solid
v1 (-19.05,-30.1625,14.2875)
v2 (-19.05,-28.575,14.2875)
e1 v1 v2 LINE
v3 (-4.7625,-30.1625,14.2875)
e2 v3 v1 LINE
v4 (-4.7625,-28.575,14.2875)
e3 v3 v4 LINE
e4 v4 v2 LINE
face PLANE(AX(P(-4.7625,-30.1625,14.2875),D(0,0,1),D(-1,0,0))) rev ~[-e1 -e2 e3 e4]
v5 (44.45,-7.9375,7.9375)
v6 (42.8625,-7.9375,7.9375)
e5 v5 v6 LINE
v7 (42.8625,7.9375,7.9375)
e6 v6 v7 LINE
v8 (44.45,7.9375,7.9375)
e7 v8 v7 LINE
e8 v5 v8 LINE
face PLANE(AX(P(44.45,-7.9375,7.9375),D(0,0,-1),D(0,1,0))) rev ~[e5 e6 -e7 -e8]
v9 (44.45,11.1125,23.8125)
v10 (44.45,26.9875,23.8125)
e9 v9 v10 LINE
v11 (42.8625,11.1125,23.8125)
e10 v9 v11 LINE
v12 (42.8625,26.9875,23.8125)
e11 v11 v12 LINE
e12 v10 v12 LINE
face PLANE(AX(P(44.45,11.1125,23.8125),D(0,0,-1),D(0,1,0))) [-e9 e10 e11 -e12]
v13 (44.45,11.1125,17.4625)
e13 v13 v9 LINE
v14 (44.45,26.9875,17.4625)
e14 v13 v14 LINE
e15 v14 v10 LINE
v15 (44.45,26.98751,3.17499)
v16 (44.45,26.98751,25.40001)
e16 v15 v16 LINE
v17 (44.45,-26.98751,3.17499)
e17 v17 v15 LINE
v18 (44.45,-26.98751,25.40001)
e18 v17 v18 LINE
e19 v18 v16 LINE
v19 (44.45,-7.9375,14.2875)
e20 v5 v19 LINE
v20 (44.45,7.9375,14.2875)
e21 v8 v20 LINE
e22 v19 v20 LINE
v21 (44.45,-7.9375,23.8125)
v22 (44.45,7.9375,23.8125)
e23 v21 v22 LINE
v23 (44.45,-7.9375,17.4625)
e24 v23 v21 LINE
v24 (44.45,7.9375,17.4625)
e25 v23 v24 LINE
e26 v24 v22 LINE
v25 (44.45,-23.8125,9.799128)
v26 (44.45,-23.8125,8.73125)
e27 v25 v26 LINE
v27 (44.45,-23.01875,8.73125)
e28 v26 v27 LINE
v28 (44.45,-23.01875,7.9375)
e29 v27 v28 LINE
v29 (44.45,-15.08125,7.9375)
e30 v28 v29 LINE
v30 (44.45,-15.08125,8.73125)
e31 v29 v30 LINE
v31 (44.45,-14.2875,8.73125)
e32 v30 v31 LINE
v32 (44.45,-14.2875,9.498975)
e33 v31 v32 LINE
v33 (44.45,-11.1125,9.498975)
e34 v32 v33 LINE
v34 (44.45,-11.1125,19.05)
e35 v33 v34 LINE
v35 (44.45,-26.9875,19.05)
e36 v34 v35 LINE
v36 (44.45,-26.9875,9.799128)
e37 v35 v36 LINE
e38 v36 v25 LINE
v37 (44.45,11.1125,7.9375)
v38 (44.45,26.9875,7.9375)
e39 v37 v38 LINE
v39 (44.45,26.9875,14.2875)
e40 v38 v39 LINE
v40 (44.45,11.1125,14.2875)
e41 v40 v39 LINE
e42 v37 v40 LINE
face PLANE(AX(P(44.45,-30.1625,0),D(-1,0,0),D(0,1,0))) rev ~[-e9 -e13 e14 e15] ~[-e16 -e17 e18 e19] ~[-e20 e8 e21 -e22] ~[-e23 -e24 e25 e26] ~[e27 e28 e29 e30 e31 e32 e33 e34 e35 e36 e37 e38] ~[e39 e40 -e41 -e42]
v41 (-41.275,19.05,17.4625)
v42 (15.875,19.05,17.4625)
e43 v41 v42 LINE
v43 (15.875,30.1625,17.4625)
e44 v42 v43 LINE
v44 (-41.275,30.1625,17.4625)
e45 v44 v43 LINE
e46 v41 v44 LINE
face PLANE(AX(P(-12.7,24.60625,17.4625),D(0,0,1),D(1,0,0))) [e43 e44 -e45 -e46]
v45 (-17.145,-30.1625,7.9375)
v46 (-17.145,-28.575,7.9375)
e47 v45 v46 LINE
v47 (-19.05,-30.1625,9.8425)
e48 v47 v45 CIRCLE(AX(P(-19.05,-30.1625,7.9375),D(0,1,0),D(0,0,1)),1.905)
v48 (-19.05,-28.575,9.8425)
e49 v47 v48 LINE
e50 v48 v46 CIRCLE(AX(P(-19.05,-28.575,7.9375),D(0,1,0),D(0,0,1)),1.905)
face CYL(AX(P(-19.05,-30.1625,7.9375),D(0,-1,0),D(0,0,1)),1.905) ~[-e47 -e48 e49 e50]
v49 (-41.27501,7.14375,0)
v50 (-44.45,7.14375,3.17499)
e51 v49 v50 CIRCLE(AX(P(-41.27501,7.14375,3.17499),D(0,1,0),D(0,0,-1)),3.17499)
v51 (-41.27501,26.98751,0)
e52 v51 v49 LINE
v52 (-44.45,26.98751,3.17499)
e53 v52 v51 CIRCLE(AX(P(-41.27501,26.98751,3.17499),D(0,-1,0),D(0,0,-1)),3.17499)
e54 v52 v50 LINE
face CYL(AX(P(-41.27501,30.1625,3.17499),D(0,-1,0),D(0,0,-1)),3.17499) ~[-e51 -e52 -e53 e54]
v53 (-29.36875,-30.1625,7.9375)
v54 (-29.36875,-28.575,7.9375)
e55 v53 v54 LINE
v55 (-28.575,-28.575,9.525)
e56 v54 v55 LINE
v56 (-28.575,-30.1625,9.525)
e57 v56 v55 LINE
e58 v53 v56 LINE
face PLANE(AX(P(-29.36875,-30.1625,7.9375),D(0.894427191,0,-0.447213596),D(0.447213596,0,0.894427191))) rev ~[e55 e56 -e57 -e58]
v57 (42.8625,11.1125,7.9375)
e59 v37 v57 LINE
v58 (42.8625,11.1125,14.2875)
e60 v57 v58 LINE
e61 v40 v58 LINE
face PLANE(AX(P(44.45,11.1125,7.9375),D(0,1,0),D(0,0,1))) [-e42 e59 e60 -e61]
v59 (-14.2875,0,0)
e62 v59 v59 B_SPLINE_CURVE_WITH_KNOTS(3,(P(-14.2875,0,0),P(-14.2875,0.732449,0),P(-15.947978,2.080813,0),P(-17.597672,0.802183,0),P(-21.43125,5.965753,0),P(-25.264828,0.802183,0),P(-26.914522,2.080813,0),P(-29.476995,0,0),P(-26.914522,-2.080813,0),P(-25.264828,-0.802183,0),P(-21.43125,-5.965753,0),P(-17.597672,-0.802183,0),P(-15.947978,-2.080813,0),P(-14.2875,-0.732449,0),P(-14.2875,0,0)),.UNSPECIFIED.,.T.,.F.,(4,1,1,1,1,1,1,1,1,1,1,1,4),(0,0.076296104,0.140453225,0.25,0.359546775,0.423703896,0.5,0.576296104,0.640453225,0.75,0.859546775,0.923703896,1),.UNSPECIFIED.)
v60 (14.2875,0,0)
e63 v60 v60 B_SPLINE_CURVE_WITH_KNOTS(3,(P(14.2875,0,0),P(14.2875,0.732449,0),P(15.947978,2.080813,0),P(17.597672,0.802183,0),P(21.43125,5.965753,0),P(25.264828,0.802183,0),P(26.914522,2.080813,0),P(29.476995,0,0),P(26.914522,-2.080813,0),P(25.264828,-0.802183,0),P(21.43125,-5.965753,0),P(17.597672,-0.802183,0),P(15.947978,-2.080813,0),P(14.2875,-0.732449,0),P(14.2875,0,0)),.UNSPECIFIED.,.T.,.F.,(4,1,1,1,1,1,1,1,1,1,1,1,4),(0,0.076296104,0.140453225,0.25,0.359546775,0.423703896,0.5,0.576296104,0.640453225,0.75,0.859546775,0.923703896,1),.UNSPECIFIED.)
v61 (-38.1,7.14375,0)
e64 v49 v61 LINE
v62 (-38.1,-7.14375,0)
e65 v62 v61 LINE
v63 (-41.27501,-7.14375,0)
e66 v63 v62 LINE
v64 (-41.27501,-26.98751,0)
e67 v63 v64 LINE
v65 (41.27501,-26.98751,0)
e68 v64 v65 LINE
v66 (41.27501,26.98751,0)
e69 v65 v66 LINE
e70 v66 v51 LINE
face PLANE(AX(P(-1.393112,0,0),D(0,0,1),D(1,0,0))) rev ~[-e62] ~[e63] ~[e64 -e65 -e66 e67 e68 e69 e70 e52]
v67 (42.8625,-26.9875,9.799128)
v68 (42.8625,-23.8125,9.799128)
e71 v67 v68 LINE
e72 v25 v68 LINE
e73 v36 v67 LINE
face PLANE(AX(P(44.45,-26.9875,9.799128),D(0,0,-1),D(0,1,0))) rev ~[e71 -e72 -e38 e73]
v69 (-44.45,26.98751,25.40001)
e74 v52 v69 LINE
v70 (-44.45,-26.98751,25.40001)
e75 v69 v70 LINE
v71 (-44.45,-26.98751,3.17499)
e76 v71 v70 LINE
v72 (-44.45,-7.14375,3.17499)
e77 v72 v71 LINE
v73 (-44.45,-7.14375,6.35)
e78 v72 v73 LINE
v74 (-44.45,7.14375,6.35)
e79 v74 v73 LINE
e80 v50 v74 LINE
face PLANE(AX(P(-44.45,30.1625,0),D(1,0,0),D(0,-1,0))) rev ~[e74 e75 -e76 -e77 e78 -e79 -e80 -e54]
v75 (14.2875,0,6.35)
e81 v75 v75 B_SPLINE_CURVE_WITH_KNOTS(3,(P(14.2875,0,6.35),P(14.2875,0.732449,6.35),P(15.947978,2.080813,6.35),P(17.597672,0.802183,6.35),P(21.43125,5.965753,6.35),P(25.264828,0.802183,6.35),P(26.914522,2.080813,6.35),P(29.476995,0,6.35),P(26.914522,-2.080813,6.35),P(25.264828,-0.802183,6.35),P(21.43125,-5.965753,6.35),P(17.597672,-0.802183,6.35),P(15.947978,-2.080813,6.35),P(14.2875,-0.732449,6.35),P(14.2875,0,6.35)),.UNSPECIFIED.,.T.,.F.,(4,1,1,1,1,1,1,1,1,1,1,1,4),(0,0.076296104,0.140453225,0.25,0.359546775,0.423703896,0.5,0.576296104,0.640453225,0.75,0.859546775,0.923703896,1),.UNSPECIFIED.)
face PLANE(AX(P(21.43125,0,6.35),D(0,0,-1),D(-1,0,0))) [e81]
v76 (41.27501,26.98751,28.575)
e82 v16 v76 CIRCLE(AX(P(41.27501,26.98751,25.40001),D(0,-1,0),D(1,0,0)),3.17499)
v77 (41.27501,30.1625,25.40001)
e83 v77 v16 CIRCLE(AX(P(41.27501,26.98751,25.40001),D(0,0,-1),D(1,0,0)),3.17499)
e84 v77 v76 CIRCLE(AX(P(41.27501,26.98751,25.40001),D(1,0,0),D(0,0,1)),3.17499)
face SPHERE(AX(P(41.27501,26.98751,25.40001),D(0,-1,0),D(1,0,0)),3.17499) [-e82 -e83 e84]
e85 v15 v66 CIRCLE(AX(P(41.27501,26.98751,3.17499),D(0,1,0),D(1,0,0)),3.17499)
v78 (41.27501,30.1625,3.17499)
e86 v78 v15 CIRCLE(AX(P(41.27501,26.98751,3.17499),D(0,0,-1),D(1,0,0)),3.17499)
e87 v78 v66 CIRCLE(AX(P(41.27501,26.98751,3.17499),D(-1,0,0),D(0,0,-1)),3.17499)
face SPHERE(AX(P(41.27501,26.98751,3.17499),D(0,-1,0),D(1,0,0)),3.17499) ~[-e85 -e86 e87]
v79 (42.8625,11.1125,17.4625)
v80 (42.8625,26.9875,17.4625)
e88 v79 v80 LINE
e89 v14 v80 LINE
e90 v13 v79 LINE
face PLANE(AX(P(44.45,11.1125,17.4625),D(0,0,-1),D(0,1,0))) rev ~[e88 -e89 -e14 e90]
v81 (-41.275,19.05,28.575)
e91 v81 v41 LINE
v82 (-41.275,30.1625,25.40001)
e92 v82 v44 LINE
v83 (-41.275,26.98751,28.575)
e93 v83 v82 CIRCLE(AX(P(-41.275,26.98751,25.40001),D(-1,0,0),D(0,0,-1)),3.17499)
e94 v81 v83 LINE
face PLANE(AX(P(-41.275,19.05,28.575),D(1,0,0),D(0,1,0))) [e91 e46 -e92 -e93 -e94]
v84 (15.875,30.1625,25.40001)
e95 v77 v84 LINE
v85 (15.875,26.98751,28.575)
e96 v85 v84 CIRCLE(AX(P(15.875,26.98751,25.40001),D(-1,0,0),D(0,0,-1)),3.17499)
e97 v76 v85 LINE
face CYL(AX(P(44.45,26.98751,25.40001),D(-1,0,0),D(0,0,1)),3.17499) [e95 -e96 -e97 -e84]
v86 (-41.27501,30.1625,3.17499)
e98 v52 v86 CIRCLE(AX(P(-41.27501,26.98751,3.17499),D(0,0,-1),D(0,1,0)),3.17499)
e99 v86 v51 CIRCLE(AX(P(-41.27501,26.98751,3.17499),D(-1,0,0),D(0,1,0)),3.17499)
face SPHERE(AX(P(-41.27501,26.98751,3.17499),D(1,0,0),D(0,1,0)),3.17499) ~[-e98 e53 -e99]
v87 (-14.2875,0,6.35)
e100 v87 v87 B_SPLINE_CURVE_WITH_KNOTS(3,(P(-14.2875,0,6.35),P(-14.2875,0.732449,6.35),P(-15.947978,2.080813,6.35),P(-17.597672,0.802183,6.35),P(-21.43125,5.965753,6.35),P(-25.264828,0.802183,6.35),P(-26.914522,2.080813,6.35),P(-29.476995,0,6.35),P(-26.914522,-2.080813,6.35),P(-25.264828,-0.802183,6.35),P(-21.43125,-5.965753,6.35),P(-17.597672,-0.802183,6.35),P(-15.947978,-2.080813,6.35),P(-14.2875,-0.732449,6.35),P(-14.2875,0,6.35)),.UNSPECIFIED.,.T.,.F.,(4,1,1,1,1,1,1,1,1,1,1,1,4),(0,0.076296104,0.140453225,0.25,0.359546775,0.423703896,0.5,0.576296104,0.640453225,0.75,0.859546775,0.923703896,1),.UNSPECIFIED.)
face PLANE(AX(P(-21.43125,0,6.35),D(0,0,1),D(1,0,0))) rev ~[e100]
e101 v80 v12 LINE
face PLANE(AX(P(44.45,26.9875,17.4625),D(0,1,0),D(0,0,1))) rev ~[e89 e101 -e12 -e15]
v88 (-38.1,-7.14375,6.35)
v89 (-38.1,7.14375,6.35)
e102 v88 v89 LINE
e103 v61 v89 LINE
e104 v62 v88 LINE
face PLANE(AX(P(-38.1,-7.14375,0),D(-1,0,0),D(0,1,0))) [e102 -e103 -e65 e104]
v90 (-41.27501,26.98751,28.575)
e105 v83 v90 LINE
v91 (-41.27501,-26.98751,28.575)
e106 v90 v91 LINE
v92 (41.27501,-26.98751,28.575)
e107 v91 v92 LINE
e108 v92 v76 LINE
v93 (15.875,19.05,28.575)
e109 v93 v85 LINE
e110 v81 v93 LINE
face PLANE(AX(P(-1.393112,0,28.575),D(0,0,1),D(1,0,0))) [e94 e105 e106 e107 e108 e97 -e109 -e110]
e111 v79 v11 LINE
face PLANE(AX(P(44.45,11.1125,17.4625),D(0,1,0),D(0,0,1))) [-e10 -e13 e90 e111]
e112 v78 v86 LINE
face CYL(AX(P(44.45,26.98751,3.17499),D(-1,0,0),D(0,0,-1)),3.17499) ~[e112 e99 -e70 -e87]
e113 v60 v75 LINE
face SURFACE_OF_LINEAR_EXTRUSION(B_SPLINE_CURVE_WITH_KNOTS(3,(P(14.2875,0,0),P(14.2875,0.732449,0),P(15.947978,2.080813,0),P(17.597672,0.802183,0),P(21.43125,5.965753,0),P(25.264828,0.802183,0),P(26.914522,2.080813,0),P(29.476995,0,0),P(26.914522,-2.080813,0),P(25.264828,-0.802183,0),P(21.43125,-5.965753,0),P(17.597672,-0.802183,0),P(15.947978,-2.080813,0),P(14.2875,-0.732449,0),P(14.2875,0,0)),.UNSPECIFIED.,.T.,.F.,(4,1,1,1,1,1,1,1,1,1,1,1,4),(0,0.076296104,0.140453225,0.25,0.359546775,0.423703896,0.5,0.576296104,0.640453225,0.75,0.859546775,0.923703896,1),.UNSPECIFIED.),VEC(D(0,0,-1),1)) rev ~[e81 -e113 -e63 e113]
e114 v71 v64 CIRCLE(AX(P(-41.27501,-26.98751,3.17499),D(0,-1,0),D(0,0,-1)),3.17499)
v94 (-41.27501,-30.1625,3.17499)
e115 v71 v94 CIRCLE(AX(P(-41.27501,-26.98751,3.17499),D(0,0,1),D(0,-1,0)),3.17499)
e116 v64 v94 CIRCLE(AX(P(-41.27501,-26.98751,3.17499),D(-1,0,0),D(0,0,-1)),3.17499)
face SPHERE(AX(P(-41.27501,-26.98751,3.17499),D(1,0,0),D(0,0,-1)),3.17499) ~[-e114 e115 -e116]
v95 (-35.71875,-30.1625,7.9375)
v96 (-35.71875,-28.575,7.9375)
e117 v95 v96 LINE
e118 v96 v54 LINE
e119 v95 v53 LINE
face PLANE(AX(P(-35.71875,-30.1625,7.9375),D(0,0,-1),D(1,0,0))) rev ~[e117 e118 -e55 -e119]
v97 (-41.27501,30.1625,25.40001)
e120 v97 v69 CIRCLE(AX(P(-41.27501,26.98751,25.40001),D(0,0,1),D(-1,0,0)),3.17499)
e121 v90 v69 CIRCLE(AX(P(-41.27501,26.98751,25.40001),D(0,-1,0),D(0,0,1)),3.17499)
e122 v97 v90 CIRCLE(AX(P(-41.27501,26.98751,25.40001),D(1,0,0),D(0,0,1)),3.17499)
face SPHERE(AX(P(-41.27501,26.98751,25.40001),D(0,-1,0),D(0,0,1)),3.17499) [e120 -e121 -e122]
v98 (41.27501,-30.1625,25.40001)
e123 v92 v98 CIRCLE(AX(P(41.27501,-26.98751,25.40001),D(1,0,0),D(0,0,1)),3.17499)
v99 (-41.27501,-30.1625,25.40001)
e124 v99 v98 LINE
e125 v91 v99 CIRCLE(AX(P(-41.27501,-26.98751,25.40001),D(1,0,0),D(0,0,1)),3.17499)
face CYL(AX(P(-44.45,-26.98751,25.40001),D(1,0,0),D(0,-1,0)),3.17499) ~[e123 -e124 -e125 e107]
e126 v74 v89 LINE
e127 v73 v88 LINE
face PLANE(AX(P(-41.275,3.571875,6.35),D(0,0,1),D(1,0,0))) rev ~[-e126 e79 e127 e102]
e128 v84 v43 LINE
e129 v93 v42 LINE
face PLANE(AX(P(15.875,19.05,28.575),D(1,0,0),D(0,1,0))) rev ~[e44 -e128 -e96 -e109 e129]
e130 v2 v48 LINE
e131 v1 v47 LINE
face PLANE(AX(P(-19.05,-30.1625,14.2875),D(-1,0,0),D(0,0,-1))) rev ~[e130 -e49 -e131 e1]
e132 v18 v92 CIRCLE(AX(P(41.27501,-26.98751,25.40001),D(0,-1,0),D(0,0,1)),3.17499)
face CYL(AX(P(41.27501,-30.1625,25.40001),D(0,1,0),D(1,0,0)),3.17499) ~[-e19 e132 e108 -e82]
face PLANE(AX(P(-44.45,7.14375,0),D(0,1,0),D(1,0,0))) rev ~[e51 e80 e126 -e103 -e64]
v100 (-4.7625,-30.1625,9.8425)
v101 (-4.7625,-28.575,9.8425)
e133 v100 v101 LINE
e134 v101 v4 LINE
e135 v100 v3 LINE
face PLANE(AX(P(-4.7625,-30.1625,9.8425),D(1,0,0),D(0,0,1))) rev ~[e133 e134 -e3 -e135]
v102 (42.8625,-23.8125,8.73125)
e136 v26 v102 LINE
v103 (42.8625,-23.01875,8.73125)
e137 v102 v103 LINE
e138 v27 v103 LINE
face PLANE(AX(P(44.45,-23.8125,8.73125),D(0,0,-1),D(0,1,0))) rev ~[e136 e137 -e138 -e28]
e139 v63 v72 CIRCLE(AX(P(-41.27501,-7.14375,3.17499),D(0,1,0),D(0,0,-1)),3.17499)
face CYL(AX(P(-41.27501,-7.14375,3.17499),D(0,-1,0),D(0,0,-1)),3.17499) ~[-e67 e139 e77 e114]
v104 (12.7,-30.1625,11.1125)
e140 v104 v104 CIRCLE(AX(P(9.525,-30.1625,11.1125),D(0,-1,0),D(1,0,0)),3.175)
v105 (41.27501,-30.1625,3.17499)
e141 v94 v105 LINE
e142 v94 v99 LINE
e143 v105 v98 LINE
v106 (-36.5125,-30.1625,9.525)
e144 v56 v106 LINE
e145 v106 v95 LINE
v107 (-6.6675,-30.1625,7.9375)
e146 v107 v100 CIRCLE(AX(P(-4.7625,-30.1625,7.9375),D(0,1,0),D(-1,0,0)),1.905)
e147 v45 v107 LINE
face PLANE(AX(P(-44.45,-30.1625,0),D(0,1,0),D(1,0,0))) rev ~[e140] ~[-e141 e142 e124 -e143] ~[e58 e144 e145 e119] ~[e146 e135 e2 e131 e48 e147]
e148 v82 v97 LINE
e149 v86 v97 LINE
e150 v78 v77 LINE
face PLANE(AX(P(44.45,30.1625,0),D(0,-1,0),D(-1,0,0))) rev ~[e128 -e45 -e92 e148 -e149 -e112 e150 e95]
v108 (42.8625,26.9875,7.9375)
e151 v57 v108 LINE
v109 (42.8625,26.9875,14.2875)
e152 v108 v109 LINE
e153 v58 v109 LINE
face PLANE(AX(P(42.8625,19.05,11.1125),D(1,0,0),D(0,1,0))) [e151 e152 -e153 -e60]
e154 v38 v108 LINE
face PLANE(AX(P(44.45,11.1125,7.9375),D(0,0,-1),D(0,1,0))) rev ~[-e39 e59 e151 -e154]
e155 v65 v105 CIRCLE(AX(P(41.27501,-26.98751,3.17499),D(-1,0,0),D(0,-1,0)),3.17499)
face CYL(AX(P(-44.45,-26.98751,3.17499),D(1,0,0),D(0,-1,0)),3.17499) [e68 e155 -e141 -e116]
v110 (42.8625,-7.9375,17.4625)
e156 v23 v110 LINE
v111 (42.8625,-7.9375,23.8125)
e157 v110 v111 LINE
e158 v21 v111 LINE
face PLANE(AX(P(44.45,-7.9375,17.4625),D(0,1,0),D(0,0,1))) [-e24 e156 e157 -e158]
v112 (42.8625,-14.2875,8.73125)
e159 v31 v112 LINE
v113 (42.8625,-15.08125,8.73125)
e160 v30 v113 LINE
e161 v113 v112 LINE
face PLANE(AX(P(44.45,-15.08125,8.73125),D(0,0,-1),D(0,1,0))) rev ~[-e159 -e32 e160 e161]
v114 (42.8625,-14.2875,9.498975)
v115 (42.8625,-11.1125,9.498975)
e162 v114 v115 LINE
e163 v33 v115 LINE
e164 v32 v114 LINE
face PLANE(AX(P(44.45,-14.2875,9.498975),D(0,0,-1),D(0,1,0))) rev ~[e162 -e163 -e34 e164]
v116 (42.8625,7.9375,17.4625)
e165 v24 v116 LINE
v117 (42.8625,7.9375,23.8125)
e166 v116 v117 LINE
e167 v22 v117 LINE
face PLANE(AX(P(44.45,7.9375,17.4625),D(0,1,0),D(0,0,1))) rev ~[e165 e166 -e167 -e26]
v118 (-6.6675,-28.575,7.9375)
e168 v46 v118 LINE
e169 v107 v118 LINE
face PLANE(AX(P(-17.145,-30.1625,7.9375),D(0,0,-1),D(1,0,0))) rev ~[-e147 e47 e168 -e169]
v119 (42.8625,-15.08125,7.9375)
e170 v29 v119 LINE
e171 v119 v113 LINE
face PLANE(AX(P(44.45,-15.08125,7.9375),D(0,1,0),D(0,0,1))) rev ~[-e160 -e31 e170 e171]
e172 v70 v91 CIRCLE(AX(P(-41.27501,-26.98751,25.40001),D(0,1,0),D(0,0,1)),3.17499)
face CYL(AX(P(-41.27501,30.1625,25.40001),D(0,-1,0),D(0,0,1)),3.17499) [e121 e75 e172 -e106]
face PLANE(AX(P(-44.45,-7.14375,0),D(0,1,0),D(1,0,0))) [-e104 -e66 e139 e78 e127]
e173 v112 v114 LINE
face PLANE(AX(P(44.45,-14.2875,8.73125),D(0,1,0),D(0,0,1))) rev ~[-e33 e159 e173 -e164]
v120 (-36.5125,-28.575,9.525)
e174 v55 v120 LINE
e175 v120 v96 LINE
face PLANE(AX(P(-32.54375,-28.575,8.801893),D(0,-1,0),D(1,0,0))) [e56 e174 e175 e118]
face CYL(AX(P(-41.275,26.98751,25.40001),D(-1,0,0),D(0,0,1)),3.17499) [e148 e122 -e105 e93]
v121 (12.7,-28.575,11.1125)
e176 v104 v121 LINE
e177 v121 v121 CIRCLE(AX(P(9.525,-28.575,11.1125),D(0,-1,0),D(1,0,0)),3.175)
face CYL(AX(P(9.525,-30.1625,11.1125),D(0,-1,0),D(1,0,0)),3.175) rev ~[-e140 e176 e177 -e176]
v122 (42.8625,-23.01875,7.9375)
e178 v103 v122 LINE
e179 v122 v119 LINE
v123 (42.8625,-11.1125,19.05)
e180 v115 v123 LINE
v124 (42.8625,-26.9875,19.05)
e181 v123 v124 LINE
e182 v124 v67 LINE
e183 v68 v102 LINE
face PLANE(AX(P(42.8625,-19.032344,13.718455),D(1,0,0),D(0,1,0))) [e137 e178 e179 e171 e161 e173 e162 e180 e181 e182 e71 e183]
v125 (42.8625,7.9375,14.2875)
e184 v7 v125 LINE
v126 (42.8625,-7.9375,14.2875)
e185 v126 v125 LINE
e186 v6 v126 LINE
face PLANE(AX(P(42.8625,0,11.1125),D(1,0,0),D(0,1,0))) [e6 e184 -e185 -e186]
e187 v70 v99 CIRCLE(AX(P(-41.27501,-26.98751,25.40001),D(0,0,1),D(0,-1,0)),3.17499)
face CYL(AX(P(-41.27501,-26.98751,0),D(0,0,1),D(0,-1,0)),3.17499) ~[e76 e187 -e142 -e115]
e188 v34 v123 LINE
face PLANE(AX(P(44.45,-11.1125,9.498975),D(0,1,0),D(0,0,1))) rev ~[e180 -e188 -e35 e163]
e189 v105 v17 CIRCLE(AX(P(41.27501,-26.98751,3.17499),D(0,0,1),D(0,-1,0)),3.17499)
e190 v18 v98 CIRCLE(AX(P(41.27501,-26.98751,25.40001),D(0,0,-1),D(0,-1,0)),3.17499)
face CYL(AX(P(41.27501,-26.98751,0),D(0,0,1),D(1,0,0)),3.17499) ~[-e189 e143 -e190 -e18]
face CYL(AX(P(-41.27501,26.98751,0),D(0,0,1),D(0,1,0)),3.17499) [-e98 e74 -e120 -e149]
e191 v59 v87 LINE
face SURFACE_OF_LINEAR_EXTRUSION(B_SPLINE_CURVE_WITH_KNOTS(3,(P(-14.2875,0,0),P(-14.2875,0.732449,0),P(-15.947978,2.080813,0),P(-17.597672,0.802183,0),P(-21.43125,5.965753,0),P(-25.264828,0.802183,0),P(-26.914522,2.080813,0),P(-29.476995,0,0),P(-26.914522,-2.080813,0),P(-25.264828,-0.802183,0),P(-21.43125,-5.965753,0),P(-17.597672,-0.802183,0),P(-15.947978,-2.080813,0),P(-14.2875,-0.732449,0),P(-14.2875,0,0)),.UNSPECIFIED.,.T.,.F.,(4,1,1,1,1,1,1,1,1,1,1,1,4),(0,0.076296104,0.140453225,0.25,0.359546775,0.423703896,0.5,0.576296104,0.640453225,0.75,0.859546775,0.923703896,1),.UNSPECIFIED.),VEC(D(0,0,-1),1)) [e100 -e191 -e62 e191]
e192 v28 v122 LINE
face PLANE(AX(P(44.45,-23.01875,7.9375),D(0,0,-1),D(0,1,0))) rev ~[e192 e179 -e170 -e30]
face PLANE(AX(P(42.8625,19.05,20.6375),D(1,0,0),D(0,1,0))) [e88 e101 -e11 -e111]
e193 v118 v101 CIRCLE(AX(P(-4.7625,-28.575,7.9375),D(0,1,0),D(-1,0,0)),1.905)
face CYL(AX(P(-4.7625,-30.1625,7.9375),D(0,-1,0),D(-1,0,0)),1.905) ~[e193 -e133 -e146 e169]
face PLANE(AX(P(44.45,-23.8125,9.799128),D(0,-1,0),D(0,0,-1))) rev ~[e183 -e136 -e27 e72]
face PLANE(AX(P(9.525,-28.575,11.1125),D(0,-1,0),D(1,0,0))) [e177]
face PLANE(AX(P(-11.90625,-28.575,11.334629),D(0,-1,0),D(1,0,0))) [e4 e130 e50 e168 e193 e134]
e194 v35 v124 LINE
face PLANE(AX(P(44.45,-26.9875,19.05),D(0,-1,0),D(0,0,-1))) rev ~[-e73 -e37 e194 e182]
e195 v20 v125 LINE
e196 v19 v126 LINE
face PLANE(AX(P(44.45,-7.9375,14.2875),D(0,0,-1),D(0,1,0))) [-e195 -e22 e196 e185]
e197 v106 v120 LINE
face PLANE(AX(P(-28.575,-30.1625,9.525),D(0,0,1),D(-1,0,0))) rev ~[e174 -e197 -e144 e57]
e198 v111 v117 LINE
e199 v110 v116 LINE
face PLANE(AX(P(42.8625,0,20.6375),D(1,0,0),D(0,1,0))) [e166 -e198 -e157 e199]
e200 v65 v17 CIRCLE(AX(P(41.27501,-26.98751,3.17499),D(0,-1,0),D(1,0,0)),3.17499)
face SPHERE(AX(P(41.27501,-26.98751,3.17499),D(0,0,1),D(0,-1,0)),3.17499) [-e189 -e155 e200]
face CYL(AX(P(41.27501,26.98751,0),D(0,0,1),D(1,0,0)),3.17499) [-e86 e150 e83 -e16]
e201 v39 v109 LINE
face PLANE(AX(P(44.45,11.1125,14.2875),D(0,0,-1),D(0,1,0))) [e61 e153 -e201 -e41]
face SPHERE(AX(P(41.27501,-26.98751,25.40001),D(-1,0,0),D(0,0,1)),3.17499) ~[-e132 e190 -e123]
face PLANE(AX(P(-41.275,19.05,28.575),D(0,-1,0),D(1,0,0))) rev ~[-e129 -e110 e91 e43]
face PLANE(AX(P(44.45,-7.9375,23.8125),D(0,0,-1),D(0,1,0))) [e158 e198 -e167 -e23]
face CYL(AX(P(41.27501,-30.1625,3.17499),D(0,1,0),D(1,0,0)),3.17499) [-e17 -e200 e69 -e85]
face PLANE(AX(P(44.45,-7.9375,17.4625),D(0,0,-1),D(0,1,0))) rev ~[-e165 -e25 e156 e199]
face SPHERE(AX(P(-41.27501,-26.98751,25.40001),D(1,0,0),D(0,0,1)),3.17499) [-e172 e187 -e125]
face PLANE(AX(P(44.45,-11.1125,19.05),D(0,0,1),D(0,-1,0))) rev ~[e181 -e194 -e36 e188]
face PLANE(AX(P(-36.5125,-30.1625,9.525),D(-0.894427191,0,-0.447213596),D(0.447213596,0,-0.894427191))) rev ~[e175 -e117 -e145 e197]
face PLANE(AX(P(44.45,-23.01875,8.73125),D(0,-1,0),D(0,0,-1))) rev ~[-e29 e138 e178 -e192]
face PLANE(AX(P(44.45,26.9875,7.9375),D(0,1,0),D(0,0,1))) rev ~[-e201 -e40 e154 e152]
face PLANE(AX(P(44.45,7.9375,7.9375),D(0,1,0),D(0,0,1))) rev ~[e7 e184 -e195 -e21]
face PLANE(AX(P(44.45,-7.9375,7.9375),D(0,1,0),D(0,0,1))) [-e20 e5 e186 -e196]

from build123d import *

# Parameters (mm, degrees)
F0_W     = 6.35
F0_H     = 7.14375
F1_DEPTH = 28.575
F2_DEPTH = 6.35
F4_W     = 15.875
F4_H     = 6.35
F5_DEPTH = 1.5875
F3_R     = 3.175
F6_DEPTH = 1.5875
F7_W     = 57.15
F7_H     = 11.1125
F8_DEPTH = 11.1125
F9_R     = 3.17499


# Not quite as in the source:
# - a fillet or chamfer is up to 0.001 mm smaller than in the source, because OpenCascade refuses the exact size


with BuildPart() as f1:
    # F0 (on Top) → F1 (new body)
    with BuildSketch(Plane.XY):
        Polygon((44.45, -30.1625), (44.45, 30.1625), (-44.45, 30.1625), (-44.45, 7.14375), (-38.1, 7.14375), (-38.1, 0), (-38.1, -7.14375), (-44.45, -7.14375), (-44.45, -30.1625), align=None)
        with BuildLine():
            add(Edge.make_bspline(
                [(-14.2875, 0), (-14.2875, 0.7324493897), (-15.9479784808, 2.0808128457), (-17.5976715514, 0.8021829538), (-21.43125, 5.9657530394), (-25.2648284486, 0.8021829538), (-26.9145215192, 2.0808128457), (-29.4769945213, 0), (-26.9145215192, -2.0808128457), (-25.2648284486, -0.8021829538), (-21.43125, -5.9657530394), (-17.5976715514, -0.8021829538), (-15.9479784808, -2.0808128457), (-14.2875, -0.7324493897), (-14.2875, 0)],
                knots=[0, 0, 0, 0, 0.0762961044, 0.1404532251, 0.25, 0.3595467749, 0.4237038956, 0.5, 0.5762961044, 0.6404532251, 0.75, 0.8595467749, 0.9237038956, 1, 1, 1, 1], degree=3))
        make_face(mode=Mode.SUBTRACT)
        with BuildLine():
            add(Edge.make_bspline(
                [(14.2875, 0), (14.2875, 0.7324493897), (15.9479784808, 2.0808128457), (17.5976715514, 0.8021829538), (21.43125, 5.9657530394), (25.2648284486, 0.8021829538), (26.9145215192, 2.0808128457), (29.4769945213, 0), (26.9145215192, -2.0808128457), (25.2648284486, -0.8021829538), (21.43125, -5.9657530394), (17.5976715514, -0.8021829538), (15.9479784808, -2.0808128457), (14.2875, -0.7324493897), (14.2875, 0)],
                knots=[0, 0, 0, 0, 0.0762961044, 0.1404532251, 0.25, 0.3595467749, 0.4237038956, 0.5, 0.5762961044, 0.6404532251, 0.75, 0.8595467749, 0.9237038956, 1, 1, 1, 1], degree=3))
        make_face(mode=Mode.SUBTRACT)
        with Locations((-41.275, 3.571875)):
            Rectangle(F0_W, F0_H)
        with Locations((-41.275, -3.571875)):
            Rectangle(F0_W, F0_H)
        with BuildLine():
            add(Edge.make_bspline(
                [(-14.2875, 0), (-14.2875, 0.7324493897), (-15.9479784808, 2.0808128457), (-17.5976715514, 0.8021829538), (-21.43125, 5.9657530394), (-25.2648284486, 0.8021829538), (-26.9145215192, 2.0808128457), (-29.4769945213, 0), (-26.9145215192, -2.0808128457), (-25.2648284486, -0.8021829538), (-21.43125, -5.9657530394), (-17.5976715514, -0.8021829538), (-15.9479784808, -2.0808128457), (-14.2875, -0.7324493897), (-14.2875, 0)],
                knots=[0, 0, 0, 0, 0.0762961044, 0.1404532251, 0.25, 0.3595467749, 0.4237038956, 0.5, 0.5762961044, 0.6404532251, 0.75, 0.8595467749, 0.9237038956, 1, 1, 1, 1], degree=3))
        make_face()
        with BuildLine():
            add(Edge.make_bspline(
                [(14.2875, 0), (14.2875, 0.7324493897), (15.9479784808, 2.0808128457), (17.5976715514, 0.8021829538), (21.43125, 5.9657530394), (25.2648284486, 0.8021829538), (26.9145215192, 2.0808128457), (29.4769945213, 0), (26.9145215192, -2.0808128457), (25.2648284486, -0.8021829538), (21.43125, -5.9657530394), (17.5976715514, -0.8021829538), (15.9479784808, -2.0808128457), (14.2875, -0.7324493897), (14.2875, 0)],
                knots=[0, 0, 0, 0, 0.0762961044, 0.1404532251, 0.25, 0.3595467749, 0.4237038956, 0.5, 0.5762961044, 0.6404532251, 0.75, 0.8595467749, 0.9237038956, 1, 1, 1, 1], degree=3))
        make_face()
    extrude(amount=F1_DEPTH)

    # F0 (on Top) → F2 (cut)
    with BuildSketch(Plane.XY):
        with Locations((-41.275, 3.571875)):
            Rectangle(F0_W, F0_H)
        with Locations((-41.275, -3.571875)):
            Rectangle(F0_W, F0_H)
        with BuildLine():
            add(Edge.make_bspline(
                [(-14.2875, 0), (-14.2875, 0.7324493897), (-15.9479784808, 2.0808128457), (-17.5976715514, 0.8021829538), (-21.43125, 5.9657530394), (-25.2648284486, 0.8021829538), (-26.9145215192, 2.0808128457), (-29.4769945213, 0), (-26.9145215192, -2.0808128457), (-25.2648284486, -0.8021829538), (-21.43125, -5.9657530394), (-17.5976715514, -0.8021829538), (-15.9479784808, -2.0808128457), (-14.2875, -0.7324493897), (-14.2875, 0)],
                knots=[0, 0, 0, 0, 0.0762961044, 0.1404532251, 0.25, 0.3595467749, 0.4237038956, 0.5, 0.5762961044, 0.6404532251, 0.75, 0.8595467749, 0.9237038956, 1, 1, 1, 1], degree=3))
        make_face()
        with BuildLine():
            add(Edge.make_bspline(
                [(14.2875, 0), (14.2875, 0.7324493897), (15.9479784808, 2.0808128457), (17.5976715514, 0.8021829538), (21.43125, 5.9657530394), (25.2648284486, 0.8021829538), (26.9145215192, 2.0808128457), (29.4769945213, 0), (26.9145215192, -2.0808128457), (25.2648284486, -0.8021829538), (21.43125, -5.9657530394), (17.5976715514, -0.8021829538), (15.9479784808, -2.0808128457), (14.2875, -0.7324493897), (14.2875, 0)],
                knots=[0, 0, 0, 0, 0.0762961044, 0.1404532251, 0.25, 0.3595467749, 0.4237038956, 0.5, 0.5762961044, 0.6404532251, 0.75, 0.8595467749, 0.9237038956, 1, 1, 1, 1], degree=3))
        make_face()
    extrude(amount=F2_DEPTH, mode=Mode.SUBTRACT)

    # F4 (on face) → F5 (cut)
    with BuildSketch(Plane.YZ.offset(44.45)):
        with Locations((19.05, 11.1125)):
            Rectangle(F4_W, F4_H)
        with Locations((19.05, 20.6375)):
            Rectangle(F4_W, F4_H)
        with Locations((0, 11.1125)):
            Rectangle(F4_W, F4_H)
        with Locations((0, 20.6375)):
            Rectangle(F4_W, F4_H)
        Polygon((-11.1125, 19.05), (-26.9875, 19.05), (-26.9875, 9.7991283983), (-23.8125, 9.7991283983), (-23.8125, 8.73125), (-23.01875, 8.73125), (-23.01875, 7.9375), (-15.08125, 7.9375), (-15.08125, 8.73125), (-14.2875, 8.73125), (-14.2875, 9.4989752397), (-11.1125, 9.4989752397), align=None)
    extrude(amount=-F5_DEPTH, mode=Mode.SUBTRACT)

    # F3 (on face) → F6 (cut)
    with BuildSketch(Plane.XZ.offset(30.1625)):
        Polygon((-28.575, 9.525), (-36.5125, 9.525), (-35.71875, 7.9375), (-29.36875, 7.9375), align=None)
        with BuildLine():
            Line((-4.7625, 14.2875), (-19.05, 14.2875))
            Line((-19.05, 14.2875), (-19.05, 9.8425))
            ThreePointArc((-19.05, 9.8425), (-17.7029615818, 9.2845384182), (-17.145, 7.9375))
            Line((-17.145, 7.9375), (-6.6675, 7.9375))
            ThreePointArc((-6.6675, 7.9375), (-6.1095384182, 9.2845384182), (-4.7625, 9.8425))
            Line((-4.7625, 9.8425), (-4.7625, 14.2875))
        make_face()
        with Locations((9.525, 11.1125)):
            Circle(F3_R)
    extrude(amount=-F6_DEPTH, mode=Mode.SUBTRACT)

    # F7 (on face) → F8 (cut)
    with BuildSketch(Plane.XY.offset(28.575)):
        with Locations((-12.7, 24.60625)):
            Rectangle(F7_W, F7_H)
    extrude(amount=-F8_DEPTH, mode=Mode.SUBTRACT)

    # F9 (radius 3.175 in the source; OpenCascade refuses exactly that, so slightly less here)
    f9_edges = [f1.edges().sort_by_distance(p)[0] for p in [
        (0, -30.1625, 28.575),
        (-44.45, 0, 28.575),
        (44.45, 0, 28.575),
        (44.45, -30.1625, 14.2875),
        (0, -30.1625, 0),
        (44.45, 0, 0),
        (44.45, 30.1625, 14.2875),
        (-42.8625, 30.1625, 28.575),
        (30.1625, 30.1625, 28.575),
        (0, 30.1625, 0),
        (-44.45, 30.1625, 14.2875),
        (-44.45, 18.653125, 0),
        (-44.45, -18.653125, 0),
        (-44.45, -30.1625, 14.2875),
    ]]
    fillet(f9_edges, radius=F9_R)


solid = f1.part
